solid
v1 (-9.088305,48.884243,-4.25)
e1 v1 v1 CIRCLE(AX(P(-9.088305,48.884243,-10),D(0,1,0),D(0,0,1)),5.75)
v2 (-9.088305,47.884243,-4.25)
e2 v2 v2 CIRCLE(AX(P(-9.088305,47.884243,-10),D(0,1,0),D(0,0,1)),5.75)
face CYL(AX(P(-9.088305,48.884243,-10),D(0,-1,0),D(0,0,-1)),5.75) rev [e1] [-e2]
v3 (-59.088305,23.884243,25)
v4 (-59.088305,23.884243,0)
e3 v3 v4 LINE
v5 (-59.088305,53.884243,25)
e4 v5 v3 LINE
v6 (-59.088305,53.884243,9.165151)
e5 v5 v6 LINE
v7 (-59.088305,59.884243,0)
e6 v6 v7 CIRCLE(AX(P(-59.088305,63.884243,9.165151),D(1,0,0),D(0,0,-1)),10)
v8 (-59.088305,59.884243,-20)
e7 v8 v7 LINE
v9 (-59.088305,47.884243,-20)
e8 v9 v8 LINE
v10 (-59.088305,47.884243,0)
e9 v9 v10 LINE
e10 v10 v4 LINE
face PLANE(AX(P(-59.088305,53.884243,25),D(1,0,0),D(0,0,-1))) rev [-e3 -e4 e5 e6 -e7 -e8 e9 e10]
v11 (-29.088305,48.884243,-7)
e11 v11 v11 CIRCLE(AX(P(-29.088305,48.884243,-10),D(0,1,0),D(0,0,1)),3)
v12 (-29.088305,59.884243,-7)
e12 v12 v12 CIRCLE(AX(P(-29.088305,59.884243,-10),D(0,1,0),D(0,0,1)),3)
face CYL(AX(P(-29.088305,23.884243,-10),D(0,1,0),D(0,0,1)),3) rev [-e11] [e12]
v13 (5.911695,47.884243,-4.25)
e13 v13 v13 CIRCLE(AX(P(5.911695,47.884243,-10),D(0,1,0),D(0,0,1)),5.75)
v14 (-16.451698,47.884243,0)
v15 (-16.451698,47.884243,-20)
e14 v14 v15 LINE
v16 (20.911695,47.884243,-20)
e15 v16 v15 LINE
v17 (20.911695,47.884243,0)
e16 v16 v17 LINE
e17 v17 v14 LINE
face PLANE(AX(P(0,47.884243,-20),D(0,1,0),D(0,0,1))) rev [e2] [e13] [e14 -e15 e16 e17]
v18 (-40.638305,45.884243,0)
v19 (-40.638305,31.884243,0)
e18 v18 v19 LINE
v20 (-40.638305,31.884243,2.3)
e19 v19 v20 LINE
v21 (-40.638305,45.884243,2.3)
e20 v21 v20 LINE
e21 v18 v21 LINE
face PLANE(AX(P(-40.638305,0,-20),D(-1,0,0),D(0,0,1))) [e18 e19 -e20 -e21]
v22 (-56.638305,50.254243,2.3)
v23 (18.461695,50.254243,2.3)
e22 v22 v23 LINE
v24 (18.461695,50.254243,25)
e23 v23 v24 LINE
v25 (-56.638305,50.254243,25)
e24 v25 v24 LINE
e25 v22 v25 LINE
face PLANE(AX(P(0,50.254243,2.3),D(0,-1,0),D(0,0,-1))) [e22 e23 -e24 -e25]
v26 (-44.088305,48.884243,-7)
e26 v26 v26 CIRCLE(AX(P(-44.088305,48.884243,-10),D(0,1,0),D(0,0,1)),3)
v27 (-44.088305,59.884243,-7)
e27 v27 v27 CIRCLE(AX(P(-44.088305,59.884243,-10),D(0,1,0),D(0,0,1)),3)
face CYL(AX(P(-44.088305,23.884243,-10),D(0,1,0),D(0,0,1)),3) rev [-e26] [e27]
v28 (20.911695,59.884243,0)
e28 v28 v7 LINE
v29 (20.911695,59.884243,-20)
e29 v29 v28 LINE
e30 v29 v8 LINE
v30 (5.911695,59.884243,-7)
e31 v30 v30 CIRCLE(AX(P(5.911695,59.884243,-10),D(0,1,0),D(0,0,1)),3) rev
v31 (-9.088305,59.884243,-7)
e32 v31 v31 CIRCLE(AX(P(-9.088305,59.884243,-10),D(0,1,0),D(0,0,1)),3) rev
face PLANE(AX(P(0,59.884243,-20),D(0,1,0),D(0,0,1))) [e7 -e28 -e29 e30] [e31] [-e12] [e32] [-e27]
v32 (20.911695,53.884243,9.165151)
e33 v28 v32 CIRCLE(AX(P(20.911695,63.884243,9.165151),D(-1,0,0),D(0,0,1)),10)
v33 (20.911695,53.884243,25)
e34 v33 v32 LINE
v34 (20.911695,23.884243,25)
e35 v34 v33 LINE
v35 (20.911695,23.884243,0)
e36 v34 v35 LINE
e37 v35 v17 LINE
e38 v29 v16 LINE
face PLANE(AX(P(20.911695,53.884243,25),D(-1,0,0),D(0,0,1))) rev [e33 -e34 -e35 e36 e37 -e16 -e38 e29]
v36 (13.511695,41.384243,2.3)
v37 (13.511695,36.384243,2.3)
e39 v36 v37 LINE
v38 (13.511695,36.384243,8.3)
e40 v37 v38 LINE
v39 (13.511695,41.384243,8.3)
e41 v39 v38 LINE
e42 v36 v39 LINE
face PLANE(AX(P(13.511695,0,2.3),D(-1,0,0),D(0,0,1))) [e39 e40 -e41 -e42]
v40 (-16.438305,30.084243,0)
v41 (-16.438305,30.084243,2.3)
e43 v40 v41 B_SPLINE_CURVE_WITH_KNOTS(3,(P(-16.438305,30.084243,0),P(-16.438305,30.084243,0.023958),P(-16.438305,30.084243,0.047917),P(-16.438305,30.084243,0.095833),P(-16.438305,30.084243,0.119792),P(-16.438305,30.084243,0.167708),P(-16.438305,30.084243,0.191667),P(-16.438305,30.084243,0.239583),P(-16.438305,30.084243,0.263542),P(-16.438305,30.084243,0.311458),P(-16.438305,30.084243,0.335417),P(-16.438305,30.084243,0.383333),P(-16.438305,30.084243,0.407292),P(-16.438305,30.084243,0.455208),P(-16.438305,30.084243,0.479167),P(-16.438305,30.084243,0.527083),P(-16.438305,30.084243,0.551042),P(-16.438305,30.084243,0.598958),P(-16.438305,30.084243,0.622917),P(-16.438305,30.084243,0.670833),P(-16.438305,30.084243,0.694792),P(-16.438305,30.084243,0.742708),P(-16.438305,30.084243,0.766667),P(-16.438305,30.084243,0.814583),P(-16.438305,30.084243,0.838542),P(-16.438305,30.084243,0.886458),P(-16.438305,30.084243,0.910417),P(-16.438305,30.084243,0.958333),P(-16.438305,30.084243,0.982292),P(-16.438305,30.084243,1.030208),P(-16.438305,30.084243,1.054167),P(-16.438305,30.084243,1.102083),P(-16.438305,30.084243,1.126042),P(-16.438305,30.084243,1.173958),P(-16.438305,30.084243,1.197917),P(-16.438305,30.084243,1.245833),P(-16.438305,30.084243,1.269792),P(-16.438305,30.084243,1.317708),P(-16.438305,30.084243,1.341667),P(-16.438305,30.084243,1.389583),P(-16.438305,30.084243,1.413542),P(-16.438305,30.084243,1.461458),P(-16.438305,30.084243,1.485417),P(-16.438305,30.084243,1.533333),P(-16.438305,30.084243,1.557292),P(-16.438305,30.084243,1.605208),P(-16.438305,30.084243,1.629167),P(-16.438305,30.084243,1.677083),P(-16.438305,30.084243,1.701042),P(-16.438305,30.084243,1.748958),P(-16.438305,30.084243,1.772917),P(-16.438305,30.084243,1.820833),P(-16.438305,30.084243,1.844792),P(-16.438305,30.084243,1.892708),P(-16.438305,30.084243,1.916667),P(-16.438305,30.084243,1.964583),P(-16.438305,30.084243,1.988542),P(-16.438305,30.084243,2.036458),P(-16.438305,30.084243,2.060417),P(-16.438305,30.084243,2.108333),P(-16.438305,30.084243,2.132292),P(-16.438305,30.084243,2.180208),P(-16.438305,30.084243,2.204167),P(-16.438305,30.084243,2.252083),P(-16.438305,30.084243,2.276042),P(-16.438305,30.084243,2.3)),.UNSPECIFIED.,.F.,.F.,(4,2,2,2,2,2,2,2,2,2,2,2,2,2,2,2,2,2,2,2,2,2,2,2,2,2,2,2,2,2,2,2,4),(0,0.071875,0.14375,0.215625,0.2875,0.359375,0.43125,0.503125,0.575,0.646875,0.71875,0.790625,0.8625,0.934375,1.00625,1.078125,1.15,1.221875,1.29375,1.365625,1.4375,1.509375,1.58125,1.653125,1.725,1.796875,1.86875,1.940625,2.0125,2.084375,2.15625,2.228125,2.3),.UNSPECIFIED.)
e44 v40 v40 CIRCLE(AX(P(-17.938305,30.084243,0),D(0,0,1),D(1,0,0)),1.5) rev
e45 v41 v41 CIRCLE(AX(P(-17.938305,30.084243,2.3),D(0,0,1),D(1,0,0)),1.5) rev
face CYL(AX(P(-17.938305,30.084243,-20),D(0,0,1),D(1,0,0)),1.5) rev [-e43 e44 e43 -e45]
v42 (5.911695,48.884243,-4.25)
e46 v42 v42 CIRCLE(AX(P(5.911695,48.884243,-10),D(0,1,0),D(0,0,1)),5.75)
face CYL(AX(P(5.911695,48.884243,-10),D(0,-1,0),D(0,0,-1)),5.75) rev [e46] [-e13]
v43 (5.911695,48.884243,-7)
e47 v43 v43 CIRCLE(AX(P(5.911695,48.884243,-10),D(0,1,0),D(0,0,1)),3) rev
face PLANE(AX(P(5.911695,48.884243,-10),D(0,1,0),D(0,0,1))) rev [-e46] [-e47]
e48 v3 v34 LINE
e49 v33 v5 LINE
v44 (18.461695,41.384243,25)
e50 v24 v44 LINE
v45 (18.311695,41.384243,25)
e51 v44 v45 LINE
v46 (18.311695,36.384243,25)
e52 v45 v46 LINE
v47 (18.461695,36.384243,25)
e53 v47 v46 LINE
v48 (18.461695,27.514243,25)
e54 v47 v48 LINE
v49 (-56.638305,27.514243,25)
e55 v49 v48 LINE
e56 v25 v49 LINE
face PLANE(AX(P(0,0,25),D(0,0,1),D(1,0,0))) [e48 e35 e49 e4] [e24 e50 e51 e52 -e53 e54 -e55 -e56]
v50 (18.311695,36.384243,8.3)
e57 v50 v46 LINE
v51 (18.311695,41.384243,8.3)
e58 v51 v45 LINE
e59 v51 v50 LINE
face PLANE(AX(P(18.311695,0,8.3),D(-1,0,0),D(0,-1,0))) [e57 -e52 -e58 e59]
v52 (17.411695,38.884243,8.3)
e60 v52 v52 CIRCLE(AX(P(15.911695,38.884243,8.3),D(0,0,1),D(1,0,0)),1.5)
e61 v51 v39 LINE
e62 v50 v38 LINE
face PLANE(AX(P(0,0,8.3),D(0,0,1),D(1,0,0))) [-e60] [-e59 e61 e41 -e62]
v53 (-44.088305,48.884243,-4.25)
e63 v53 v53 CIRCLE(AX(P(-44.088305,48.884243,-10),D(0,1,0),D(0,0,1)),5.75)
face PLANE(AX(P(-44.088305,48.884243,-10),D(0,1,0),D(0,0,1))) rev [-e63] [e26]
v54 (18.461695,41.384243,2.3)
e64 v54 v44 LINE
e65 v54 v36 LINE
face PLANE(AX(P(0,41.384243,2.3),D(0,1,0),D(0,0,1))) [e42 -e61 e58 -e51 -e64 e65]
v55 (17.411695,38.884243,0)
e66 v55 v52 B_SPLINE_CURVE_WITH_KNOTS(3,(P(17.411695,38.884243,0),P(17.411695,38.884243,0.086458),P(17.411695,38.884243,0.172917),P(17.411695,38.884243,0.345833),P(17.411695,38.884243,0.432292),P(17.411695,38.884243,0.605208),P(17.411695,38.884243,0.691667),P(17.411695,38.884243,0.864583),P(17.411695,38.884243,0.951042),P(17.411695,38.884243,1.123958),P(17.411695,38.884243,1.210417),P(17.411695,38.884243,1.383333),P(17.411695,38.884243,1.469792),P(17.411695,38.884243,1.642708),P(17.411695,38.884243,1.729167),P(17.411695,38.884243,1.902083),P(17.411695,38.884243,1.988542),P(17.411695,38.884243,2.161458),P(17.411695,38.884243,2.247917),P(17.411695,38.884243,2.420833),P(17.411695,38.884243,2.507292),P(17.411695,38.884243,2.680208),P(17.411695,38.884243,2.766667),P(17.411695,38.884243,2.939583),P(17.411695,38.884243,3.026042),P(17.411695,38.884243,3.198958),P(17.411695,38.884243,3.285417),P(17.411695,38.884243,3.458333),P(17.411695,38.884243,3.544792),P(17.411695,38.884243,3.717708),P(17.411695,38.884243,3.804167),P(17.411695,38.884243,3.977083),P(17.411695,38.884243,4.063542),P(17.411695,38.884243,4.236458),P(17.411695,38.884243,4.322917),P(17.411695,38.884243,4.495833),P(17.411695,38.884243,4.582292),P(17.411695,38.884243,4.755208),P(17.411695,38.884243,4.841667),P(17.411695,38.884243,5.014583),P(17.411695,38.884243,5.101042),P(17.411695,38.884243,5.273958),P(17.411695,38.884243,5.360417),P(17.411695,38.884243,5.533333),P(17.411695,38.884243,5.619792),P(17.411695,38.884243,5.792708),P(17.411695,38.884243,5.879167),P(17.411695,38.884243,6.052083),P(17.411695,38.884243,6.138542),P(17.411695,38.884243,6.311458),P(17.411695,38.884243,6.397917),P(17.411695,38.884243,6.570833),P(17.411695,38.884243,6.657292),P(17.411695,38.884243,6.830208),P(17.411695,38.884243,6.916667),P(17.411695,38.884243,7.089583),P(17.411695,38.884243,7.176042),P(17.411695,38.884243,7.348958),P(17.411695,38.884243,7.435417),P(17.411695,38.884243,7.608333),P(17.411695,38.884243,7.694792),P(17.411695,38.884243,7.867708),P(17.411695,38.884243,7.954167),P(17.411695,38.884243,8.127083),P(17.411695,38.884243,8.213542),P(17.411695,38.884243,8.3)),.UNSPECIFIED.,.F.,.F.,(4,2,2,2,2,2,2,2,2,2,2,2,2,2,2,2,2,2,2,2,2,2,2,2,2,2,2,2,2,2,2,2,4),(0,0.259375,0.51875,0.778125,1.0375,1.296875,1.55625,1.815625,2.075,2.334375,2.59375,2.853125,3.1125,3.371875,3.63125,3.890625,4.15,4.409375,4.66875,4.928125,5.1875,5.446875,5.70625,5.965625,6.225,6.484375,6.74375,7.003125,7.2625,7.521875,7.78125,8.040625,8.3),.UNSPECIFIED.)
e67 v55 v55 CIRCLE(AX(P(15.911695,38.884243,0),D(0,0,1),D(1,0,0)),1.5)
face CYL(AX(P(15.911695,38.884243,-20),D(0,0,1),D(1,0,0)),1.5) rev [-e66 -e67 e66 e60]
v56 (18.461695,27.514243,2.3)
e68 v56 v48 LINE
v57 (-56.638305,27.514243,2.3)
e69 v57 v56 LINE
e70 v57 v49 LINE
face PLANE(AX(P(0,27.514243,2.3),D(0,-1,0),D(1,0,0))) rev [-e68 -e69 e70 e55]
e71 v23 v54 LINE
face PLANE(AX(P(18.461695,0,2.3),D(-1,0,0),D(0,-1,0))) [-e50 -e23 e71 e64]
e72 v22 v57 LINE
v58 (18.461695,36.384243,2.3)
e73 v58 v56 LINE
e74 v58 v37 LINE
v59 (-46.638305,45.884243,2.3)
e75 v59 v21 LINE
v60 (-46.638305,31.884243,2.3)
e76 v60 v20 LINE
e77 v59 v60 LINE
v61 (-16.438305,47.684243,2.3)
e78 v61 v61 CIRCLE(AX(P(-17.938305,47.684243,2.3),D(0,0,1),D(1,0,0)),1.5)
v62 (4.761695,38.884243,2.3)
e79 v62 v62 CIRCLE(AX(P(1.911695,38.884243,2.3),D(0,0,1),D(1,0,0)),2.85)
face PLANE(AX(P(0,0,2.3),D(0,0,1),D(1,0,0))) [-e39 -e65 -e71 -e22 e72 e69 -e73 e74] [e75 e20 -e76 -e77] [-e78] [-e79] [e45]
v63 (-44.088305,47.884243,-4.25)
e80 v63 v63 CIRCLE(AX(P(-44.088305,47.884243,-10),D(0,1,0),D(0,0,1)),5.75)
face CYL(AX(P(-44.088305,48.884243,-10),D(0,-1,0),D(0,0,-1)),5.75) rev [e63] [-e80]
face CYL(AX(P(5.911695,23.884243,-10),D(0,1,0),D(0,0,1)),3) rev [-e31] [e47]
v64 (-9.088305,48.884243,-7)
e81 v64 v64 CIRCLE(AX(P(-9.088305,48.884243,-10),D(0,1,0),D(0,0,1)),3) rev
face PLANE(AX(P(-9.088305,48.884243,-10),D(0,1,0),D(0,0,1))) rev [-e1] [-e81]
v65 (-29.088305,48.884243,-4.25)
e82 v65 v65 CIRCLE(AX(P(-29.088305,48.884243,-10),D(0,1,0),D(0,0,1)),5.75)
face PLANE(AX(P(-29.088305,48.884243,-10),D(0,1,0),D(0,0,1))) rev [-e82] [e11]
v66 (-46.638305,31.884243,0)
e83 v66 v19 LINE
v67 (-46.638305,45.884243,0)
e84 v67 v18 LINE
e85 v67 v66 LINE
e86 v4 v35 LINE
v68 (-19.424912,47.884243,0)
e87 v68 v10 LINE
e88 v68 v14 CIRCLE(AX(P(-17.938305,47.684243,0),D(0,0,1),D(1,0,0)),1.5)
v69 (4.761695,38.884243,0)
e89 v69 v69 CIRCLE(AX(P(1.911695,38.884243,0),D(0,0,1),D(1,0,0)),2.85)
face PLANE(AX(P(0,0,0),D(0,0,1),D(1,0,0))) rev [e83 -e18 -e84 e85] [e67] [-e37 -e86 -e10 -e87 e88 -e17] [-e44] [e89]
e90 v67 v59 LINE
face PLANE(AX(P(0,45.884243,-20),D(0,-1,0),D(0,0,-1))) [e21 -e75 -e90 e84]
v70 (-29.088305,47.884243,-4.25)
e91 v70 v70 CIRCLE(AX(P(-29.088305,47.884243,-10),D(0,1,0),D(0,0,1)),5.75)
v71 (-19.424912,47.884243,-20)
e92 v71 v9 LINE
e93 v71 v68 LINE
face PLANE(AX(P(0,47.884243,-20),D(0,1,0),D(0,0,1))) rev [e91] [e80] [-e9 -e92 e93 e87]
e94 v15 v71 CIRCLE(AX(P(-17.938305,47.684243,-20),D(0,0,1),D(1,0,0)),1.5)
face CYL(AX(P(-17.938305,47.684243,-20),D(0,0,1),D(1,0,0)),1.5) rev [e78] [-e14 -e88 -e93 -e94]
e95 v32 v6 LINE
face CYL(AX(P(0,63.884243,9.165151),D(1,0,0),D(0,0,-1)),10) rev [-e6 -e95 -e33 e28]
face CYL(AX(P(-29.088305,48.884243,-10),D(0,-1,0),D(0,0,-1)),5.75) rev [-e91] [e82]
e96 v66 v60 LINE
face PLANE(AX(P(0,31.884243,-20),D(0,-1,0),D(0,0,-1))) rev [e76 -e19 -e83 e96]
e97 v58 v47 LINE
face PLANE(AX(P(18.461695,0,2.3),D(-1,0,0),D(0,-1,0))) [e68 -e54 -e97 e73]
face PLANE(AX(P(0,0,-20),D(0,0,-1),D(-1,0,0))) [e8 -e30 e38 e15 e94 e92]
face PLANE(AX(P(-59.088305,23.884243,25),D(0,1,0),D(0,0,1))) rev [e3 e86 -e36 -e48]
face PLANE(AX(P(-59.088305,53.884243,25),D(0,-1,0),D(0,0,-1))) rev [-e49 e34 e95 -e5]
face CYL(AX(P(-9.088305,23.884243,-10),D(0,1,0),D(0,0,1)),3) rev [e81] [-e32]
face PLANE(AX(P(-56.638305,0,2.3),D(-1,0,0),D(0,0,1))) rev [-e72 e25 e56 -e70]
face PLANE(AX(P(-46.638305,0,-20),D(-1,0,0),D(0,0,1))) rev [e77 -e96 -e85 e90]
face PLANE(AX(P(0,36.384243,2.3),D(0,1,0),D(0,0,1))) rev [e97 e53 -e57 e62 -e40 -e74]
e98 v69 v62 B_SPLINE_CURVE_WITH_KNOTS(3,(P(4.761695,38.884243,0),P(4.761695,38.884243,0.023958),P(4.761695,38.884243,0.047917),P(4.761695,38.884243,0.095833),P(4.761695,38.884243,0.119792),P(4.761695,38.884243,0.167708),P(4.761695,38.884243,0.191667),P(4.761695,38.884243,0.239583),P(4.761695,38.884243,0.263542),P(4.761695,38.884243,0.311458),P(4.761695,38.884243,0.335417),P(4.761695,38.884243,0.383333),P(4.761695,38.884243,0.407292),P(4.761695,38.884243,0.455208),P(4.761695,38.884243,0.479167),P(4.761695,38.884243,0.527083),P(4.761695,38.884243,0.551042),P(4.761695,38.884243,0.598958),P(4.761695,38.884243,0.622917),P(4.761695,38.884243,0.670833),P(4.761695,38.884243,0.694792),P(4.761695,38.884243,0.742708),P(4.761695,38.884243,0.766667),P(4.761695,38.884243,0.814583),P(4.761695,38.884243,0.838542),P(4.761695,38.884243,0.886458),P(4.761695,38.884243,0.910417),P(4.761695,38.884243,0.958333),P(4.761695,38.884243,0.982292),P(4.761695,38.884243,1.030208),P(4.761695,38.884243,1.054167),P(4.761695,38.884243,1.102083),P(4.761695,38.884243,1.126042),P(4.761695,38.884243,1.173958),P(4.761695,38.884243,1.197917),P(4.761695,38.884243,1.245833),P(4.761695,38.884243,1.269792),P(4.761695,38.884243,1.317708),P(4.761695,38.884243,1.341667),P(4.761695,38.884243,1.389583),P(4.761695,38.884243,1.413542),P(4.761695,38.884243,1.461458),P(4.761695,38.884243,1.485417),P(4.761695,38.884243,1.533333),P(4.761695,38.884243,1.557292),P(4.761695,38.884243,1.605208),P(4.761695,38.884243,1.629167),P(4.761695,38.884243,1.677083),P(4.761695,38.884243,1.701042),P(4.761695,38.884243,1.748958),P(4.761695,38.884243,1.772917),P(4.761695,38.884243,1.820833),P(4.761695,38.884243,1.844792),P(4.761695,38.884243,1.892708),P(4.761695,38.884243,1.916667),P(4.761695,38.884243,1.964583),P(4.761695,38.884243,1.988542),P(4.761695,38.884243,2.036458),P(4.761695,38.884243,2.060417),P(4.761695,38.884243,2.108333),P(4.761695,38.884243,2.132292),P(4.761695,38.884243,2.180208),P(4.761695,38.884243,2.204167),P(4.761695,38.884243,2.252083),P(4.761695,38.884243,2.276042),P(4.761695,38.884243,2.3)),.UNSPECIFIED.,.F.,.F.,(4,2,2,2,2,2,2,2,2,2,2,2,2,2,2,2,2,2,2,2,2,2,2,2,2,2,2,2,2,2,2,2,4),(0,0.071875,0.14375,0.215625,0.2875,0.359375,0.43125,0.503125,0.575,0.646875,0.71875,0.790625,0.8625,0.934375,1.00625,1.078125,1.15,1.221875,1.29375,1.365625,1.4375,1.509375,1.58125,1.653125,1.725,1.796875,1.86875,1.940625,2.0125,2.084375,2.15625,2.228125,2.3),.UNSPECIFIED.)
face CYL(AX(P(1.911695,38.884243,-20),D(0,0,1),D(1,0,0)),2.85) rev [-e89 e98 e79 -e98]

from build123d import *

# Parameters (mm, degrees)
SKETCH1_W                 = 80
SKETCH1_H                 = 30
MOTOR_HOUSING_DEPTH       = 25
SKETCH2_W                 = 80
SKETCH2_H                 = 6
ATATACH_TO_BODY_R_DEPTH   = 20
FILLET_R_R                = 10
SCREW_START               = -12
SKETCH3_R                 = 5.75
SKETCH3_R_2               = 3
SCREW_HEAD_INSETS_R_DEPTH = 1
SKETCH3_2_R               = 3
SCREW_HOLES_R_DEPTH       = 74.569203879
SKETCH4_R                 = 1.5
SKETCH4_R_2               = 2.85
SKETCH4_W                 = 6
SKETCH4_H                 = 14
MOTOR_HOLES_DEPTH         = 96.407286673
SKETCH4_3_R               = 1.5
SKETCH4_3_R_2             = 2.85
SKETCH4_3_W               = 6
SKETCH4_3_H               = 14
MOTOR_CAVITY_DEPTH        = 22.7
SKETCH4_4_W               = 4.8
SKETCH4_4_H               = 5
SKETCH4_4_R               = 1.5
MOUNT_STABILITY_DEPTH     = 16.7


with BuildPart() as part:
    # Sketch1 → Motor Housing (new body)
    with BuildSketch(Plane.XY):
        with Locations((-19.08830476, 38.88424326)):
            Rectangle(SKETCH1_W, SKETCH1_H)
    extrude(amount=MOTOR_HOUSING_DEPTH)

    # Sketch2 → Atatach to Body R (add)
    with BuildSketch(Plane(origin=(0, 0, 0), x_dir=(-1, 0, 0), z_dir=(0, 0, -1))):
        with Locations((19.08830476, 50.88424326)):
            Rectangle(SKETCH2_W, SKETCH2_H)
        with Locations((19.08830476, 56.88424326)):
            Rectangle(SKETCH2_W, SKETCH2_H)
    extrude(amount=ATATACH_TO_BODY_R_DEPTH)

    # Fillet R
    # the kernel refuses this fillet: 10 mm, written as the material it adds along each edge
    with BuildSketch(Plane(origin=(-59.08830476, 53.88424326, 0), x_dir=(0, 0, 1), z_dir=(1, 0, 0))) as fillet_r_piece_1:
        with BuildLine():
            CenterArc((9.16515139, -10), FILLET_R_R, 90, 66.421821522)
            Line((0, -6), (-0.183303028, -5.92))
            ThreePointArc((-0.183303028, -5.92), (-0.2, -3), (-0.2, 0))
            Line((-0.2, 0), (0, 0.2))
            Line((0, 0.2), (9.16515139, 0.2))
            Line((9.16515139, 0.2), (9.16515139, 0))
        make_face()
    extrude(amount=80)

    # Sketch3 → Screw Head Insets R (cut)
    # profile 1 of 4: a face of its own
    with BuildSketch(Plane(origin=(0, 59.88424326, 0), x_dir=(1, 0, 0), z_dir=(0, 1, 0)).offset(SCREW_START)):
        with Locations(Location((-44.08830476, 10, 0), (0, 0, 270))):
            Circle(SKETCH3_R)
        with Locations(Location((-44.08830476, 10, 0), (0, 0, 270))):
            Circle(SKETCH3_R_2, mode=Mode.SUBTRACT)
    # profile 2 of 4: a face of its own
    with BuildSketch(Plane(origin=(0, 59.88424326, 0), x_dir=(1, 0, 0), z_dir=(0, 1, 0)).offset(SCREW_START)):
        with Locations(Location((-29.08830476, 10, 0), (0, 0, 270))):
            Circle(SKETCH3_R)
        with Locations(Location((-29.08830476, 10, 0), (0, 0, 270))):
            Circle(SKETCH3_R_2, mode=Mode.SUBTRACT)
    # profile 3 of 4: a face of its own
    with BuildSketch(Plane(origin=(0, 59.88424326, 0), x_dir=(1, 0, 0), z_dir=(0, 1, 0)).offset(SCREW_START)):
        with Locations(Location((5.91169524, 10, 0), (0, 0, 270))):
            Circle(SKETCH3_R)
        with Locations(Location((5.91169524, 10, 0), (0, 0, 270))):
            Circle(SKETCH3_R_2, mode=Mode.SUBTRACT)
    # profile 4 of 4: a face of its own
    with BuildSketch(Plane(origin=(0, 59.88424326, 0), x_dir=(1, 0, 0), z_dir=(0, 1, 0)).offset(SCREW_START)):
        with Locations(Location((-9.08830476, 10, 0), (0, 0, 270))):
            Circle(SKETCH3_R)
        with Locations(Location((-9.08830476, 10, 0), (0, 0, 270))):
            Circle(SKETCH3_R_2, mode=Mode.SUBTRACT)
    extrude(amount=SCREW_HEAD_INSETS_R_DEPTH, mode=Mode.SUBTRACT)

    # Sketch3<2> → Screw Holes R (cut, through all)
    with BuildSketch(Plane(origin=(0, 59.88424326, 0), x_dir=(1, 0, 0), z_dir=(0, 1, 0))):
        with Locations(Location((5.91169524, 10, 0), (0, 0, 270))):
            Circle(SKETCH3_2_R)
        with Locations(Location((-9.08830476, 10, 0), (0, 0, 270))):
            Circle(SKETCH3_2_R)
        with Locations(Location((-29.08830476, 10, 0), (0, 0, 270))):
            Circle(SKETCH3_2_R)
        with Locations(Location((-44.08830476, 10, 0), (0, 0, 270))):
            Circle(SKETCH3_2_R)
    extrude(amount=-SCREW_HOLES_R_DEPTH, mode=Mode.SUBTRACT)

    # Sketch4 → Motor Holes (cut, through all)
    with BuildSketch(Plane.XY.offset(25)):
        with Locations((-17.93830476, 47.68424326)):
            Circle(SKETCH4_R)
        with Locations((-17.93830476, 30.08424326)):
            Circle(SKETCH4_R)
        with Locations((1.91169524, 38.88424326)):
            Circle(SKETCH4_R_2)
        with Locations((15.91169524, 38.88424326)):
            Circle(SKETCH4_R)
        with Locations((-43.63830476, 38.88424326)):
            Rectangle(SKETCH4_W, SKETCH4_H)
    extrude(amount=-MOTOR_HOLES_DEPTH, mode=Mode.SUBTRACT)

    # Sketch4<3> → Motor Cavity (cut)
    with BuildSketch(Plane.XY.offset(25)):
        Polygon((18.46169524, 50.25424326), (-56.63830476, 50.25424326), (-56.63830476, 27.51424326), (18.46169524, 27.51424326), (18.46169524, 36.38424326), (18.31169524, 36.38424326), (13.51169524, 36.38424326), (13.51169524, 41.38424326), (18.31169524, 41.38424326), (18.46169524, 41.38424326), align=None)
        with Locations((-17.93830476, 30.08424326)):
            Circle(SKETCH4_3_R, mode=Mode.SUBTRACT)
        with Locations((1.91169524, 38.88424326)):
            Circle(SKETCH4_3_R_2, mode=Mode.SUBTRACT)
        with Locations((-43.63830476, 38.88424326)):
            Rectangle(SKETCH4_3_W, SKETCH4_3_H, mode=Mode.SUBTRACT)
        with Locations((-17.93830476, 47.68424326)):
            Circle(SKETCH4_3_R, mode=Mode.SUBTRACT)
    extrude(amount=-MOTOR_CAVITY_DEPTH, mode=Mode.SUBTRACT)

    # Sketch4<4> → Mount Stability (cut)
    with BuildSketch(Plane.XY.offset(25)):
        with Locations((15.91169524, 38.88424326)):
            Rectangle(SKETCH4_4_W, SKETCH4_4_H)
        with Locations((15.91169524, 38.88424326)):
            Circle(SKETCH4_4_R, mode=Mode.SUBTRACT)
    extrude(amount=-MOUNT_STABILITY_DEPTH, mode=Mode.SUBTRACT)


solid = part.part
